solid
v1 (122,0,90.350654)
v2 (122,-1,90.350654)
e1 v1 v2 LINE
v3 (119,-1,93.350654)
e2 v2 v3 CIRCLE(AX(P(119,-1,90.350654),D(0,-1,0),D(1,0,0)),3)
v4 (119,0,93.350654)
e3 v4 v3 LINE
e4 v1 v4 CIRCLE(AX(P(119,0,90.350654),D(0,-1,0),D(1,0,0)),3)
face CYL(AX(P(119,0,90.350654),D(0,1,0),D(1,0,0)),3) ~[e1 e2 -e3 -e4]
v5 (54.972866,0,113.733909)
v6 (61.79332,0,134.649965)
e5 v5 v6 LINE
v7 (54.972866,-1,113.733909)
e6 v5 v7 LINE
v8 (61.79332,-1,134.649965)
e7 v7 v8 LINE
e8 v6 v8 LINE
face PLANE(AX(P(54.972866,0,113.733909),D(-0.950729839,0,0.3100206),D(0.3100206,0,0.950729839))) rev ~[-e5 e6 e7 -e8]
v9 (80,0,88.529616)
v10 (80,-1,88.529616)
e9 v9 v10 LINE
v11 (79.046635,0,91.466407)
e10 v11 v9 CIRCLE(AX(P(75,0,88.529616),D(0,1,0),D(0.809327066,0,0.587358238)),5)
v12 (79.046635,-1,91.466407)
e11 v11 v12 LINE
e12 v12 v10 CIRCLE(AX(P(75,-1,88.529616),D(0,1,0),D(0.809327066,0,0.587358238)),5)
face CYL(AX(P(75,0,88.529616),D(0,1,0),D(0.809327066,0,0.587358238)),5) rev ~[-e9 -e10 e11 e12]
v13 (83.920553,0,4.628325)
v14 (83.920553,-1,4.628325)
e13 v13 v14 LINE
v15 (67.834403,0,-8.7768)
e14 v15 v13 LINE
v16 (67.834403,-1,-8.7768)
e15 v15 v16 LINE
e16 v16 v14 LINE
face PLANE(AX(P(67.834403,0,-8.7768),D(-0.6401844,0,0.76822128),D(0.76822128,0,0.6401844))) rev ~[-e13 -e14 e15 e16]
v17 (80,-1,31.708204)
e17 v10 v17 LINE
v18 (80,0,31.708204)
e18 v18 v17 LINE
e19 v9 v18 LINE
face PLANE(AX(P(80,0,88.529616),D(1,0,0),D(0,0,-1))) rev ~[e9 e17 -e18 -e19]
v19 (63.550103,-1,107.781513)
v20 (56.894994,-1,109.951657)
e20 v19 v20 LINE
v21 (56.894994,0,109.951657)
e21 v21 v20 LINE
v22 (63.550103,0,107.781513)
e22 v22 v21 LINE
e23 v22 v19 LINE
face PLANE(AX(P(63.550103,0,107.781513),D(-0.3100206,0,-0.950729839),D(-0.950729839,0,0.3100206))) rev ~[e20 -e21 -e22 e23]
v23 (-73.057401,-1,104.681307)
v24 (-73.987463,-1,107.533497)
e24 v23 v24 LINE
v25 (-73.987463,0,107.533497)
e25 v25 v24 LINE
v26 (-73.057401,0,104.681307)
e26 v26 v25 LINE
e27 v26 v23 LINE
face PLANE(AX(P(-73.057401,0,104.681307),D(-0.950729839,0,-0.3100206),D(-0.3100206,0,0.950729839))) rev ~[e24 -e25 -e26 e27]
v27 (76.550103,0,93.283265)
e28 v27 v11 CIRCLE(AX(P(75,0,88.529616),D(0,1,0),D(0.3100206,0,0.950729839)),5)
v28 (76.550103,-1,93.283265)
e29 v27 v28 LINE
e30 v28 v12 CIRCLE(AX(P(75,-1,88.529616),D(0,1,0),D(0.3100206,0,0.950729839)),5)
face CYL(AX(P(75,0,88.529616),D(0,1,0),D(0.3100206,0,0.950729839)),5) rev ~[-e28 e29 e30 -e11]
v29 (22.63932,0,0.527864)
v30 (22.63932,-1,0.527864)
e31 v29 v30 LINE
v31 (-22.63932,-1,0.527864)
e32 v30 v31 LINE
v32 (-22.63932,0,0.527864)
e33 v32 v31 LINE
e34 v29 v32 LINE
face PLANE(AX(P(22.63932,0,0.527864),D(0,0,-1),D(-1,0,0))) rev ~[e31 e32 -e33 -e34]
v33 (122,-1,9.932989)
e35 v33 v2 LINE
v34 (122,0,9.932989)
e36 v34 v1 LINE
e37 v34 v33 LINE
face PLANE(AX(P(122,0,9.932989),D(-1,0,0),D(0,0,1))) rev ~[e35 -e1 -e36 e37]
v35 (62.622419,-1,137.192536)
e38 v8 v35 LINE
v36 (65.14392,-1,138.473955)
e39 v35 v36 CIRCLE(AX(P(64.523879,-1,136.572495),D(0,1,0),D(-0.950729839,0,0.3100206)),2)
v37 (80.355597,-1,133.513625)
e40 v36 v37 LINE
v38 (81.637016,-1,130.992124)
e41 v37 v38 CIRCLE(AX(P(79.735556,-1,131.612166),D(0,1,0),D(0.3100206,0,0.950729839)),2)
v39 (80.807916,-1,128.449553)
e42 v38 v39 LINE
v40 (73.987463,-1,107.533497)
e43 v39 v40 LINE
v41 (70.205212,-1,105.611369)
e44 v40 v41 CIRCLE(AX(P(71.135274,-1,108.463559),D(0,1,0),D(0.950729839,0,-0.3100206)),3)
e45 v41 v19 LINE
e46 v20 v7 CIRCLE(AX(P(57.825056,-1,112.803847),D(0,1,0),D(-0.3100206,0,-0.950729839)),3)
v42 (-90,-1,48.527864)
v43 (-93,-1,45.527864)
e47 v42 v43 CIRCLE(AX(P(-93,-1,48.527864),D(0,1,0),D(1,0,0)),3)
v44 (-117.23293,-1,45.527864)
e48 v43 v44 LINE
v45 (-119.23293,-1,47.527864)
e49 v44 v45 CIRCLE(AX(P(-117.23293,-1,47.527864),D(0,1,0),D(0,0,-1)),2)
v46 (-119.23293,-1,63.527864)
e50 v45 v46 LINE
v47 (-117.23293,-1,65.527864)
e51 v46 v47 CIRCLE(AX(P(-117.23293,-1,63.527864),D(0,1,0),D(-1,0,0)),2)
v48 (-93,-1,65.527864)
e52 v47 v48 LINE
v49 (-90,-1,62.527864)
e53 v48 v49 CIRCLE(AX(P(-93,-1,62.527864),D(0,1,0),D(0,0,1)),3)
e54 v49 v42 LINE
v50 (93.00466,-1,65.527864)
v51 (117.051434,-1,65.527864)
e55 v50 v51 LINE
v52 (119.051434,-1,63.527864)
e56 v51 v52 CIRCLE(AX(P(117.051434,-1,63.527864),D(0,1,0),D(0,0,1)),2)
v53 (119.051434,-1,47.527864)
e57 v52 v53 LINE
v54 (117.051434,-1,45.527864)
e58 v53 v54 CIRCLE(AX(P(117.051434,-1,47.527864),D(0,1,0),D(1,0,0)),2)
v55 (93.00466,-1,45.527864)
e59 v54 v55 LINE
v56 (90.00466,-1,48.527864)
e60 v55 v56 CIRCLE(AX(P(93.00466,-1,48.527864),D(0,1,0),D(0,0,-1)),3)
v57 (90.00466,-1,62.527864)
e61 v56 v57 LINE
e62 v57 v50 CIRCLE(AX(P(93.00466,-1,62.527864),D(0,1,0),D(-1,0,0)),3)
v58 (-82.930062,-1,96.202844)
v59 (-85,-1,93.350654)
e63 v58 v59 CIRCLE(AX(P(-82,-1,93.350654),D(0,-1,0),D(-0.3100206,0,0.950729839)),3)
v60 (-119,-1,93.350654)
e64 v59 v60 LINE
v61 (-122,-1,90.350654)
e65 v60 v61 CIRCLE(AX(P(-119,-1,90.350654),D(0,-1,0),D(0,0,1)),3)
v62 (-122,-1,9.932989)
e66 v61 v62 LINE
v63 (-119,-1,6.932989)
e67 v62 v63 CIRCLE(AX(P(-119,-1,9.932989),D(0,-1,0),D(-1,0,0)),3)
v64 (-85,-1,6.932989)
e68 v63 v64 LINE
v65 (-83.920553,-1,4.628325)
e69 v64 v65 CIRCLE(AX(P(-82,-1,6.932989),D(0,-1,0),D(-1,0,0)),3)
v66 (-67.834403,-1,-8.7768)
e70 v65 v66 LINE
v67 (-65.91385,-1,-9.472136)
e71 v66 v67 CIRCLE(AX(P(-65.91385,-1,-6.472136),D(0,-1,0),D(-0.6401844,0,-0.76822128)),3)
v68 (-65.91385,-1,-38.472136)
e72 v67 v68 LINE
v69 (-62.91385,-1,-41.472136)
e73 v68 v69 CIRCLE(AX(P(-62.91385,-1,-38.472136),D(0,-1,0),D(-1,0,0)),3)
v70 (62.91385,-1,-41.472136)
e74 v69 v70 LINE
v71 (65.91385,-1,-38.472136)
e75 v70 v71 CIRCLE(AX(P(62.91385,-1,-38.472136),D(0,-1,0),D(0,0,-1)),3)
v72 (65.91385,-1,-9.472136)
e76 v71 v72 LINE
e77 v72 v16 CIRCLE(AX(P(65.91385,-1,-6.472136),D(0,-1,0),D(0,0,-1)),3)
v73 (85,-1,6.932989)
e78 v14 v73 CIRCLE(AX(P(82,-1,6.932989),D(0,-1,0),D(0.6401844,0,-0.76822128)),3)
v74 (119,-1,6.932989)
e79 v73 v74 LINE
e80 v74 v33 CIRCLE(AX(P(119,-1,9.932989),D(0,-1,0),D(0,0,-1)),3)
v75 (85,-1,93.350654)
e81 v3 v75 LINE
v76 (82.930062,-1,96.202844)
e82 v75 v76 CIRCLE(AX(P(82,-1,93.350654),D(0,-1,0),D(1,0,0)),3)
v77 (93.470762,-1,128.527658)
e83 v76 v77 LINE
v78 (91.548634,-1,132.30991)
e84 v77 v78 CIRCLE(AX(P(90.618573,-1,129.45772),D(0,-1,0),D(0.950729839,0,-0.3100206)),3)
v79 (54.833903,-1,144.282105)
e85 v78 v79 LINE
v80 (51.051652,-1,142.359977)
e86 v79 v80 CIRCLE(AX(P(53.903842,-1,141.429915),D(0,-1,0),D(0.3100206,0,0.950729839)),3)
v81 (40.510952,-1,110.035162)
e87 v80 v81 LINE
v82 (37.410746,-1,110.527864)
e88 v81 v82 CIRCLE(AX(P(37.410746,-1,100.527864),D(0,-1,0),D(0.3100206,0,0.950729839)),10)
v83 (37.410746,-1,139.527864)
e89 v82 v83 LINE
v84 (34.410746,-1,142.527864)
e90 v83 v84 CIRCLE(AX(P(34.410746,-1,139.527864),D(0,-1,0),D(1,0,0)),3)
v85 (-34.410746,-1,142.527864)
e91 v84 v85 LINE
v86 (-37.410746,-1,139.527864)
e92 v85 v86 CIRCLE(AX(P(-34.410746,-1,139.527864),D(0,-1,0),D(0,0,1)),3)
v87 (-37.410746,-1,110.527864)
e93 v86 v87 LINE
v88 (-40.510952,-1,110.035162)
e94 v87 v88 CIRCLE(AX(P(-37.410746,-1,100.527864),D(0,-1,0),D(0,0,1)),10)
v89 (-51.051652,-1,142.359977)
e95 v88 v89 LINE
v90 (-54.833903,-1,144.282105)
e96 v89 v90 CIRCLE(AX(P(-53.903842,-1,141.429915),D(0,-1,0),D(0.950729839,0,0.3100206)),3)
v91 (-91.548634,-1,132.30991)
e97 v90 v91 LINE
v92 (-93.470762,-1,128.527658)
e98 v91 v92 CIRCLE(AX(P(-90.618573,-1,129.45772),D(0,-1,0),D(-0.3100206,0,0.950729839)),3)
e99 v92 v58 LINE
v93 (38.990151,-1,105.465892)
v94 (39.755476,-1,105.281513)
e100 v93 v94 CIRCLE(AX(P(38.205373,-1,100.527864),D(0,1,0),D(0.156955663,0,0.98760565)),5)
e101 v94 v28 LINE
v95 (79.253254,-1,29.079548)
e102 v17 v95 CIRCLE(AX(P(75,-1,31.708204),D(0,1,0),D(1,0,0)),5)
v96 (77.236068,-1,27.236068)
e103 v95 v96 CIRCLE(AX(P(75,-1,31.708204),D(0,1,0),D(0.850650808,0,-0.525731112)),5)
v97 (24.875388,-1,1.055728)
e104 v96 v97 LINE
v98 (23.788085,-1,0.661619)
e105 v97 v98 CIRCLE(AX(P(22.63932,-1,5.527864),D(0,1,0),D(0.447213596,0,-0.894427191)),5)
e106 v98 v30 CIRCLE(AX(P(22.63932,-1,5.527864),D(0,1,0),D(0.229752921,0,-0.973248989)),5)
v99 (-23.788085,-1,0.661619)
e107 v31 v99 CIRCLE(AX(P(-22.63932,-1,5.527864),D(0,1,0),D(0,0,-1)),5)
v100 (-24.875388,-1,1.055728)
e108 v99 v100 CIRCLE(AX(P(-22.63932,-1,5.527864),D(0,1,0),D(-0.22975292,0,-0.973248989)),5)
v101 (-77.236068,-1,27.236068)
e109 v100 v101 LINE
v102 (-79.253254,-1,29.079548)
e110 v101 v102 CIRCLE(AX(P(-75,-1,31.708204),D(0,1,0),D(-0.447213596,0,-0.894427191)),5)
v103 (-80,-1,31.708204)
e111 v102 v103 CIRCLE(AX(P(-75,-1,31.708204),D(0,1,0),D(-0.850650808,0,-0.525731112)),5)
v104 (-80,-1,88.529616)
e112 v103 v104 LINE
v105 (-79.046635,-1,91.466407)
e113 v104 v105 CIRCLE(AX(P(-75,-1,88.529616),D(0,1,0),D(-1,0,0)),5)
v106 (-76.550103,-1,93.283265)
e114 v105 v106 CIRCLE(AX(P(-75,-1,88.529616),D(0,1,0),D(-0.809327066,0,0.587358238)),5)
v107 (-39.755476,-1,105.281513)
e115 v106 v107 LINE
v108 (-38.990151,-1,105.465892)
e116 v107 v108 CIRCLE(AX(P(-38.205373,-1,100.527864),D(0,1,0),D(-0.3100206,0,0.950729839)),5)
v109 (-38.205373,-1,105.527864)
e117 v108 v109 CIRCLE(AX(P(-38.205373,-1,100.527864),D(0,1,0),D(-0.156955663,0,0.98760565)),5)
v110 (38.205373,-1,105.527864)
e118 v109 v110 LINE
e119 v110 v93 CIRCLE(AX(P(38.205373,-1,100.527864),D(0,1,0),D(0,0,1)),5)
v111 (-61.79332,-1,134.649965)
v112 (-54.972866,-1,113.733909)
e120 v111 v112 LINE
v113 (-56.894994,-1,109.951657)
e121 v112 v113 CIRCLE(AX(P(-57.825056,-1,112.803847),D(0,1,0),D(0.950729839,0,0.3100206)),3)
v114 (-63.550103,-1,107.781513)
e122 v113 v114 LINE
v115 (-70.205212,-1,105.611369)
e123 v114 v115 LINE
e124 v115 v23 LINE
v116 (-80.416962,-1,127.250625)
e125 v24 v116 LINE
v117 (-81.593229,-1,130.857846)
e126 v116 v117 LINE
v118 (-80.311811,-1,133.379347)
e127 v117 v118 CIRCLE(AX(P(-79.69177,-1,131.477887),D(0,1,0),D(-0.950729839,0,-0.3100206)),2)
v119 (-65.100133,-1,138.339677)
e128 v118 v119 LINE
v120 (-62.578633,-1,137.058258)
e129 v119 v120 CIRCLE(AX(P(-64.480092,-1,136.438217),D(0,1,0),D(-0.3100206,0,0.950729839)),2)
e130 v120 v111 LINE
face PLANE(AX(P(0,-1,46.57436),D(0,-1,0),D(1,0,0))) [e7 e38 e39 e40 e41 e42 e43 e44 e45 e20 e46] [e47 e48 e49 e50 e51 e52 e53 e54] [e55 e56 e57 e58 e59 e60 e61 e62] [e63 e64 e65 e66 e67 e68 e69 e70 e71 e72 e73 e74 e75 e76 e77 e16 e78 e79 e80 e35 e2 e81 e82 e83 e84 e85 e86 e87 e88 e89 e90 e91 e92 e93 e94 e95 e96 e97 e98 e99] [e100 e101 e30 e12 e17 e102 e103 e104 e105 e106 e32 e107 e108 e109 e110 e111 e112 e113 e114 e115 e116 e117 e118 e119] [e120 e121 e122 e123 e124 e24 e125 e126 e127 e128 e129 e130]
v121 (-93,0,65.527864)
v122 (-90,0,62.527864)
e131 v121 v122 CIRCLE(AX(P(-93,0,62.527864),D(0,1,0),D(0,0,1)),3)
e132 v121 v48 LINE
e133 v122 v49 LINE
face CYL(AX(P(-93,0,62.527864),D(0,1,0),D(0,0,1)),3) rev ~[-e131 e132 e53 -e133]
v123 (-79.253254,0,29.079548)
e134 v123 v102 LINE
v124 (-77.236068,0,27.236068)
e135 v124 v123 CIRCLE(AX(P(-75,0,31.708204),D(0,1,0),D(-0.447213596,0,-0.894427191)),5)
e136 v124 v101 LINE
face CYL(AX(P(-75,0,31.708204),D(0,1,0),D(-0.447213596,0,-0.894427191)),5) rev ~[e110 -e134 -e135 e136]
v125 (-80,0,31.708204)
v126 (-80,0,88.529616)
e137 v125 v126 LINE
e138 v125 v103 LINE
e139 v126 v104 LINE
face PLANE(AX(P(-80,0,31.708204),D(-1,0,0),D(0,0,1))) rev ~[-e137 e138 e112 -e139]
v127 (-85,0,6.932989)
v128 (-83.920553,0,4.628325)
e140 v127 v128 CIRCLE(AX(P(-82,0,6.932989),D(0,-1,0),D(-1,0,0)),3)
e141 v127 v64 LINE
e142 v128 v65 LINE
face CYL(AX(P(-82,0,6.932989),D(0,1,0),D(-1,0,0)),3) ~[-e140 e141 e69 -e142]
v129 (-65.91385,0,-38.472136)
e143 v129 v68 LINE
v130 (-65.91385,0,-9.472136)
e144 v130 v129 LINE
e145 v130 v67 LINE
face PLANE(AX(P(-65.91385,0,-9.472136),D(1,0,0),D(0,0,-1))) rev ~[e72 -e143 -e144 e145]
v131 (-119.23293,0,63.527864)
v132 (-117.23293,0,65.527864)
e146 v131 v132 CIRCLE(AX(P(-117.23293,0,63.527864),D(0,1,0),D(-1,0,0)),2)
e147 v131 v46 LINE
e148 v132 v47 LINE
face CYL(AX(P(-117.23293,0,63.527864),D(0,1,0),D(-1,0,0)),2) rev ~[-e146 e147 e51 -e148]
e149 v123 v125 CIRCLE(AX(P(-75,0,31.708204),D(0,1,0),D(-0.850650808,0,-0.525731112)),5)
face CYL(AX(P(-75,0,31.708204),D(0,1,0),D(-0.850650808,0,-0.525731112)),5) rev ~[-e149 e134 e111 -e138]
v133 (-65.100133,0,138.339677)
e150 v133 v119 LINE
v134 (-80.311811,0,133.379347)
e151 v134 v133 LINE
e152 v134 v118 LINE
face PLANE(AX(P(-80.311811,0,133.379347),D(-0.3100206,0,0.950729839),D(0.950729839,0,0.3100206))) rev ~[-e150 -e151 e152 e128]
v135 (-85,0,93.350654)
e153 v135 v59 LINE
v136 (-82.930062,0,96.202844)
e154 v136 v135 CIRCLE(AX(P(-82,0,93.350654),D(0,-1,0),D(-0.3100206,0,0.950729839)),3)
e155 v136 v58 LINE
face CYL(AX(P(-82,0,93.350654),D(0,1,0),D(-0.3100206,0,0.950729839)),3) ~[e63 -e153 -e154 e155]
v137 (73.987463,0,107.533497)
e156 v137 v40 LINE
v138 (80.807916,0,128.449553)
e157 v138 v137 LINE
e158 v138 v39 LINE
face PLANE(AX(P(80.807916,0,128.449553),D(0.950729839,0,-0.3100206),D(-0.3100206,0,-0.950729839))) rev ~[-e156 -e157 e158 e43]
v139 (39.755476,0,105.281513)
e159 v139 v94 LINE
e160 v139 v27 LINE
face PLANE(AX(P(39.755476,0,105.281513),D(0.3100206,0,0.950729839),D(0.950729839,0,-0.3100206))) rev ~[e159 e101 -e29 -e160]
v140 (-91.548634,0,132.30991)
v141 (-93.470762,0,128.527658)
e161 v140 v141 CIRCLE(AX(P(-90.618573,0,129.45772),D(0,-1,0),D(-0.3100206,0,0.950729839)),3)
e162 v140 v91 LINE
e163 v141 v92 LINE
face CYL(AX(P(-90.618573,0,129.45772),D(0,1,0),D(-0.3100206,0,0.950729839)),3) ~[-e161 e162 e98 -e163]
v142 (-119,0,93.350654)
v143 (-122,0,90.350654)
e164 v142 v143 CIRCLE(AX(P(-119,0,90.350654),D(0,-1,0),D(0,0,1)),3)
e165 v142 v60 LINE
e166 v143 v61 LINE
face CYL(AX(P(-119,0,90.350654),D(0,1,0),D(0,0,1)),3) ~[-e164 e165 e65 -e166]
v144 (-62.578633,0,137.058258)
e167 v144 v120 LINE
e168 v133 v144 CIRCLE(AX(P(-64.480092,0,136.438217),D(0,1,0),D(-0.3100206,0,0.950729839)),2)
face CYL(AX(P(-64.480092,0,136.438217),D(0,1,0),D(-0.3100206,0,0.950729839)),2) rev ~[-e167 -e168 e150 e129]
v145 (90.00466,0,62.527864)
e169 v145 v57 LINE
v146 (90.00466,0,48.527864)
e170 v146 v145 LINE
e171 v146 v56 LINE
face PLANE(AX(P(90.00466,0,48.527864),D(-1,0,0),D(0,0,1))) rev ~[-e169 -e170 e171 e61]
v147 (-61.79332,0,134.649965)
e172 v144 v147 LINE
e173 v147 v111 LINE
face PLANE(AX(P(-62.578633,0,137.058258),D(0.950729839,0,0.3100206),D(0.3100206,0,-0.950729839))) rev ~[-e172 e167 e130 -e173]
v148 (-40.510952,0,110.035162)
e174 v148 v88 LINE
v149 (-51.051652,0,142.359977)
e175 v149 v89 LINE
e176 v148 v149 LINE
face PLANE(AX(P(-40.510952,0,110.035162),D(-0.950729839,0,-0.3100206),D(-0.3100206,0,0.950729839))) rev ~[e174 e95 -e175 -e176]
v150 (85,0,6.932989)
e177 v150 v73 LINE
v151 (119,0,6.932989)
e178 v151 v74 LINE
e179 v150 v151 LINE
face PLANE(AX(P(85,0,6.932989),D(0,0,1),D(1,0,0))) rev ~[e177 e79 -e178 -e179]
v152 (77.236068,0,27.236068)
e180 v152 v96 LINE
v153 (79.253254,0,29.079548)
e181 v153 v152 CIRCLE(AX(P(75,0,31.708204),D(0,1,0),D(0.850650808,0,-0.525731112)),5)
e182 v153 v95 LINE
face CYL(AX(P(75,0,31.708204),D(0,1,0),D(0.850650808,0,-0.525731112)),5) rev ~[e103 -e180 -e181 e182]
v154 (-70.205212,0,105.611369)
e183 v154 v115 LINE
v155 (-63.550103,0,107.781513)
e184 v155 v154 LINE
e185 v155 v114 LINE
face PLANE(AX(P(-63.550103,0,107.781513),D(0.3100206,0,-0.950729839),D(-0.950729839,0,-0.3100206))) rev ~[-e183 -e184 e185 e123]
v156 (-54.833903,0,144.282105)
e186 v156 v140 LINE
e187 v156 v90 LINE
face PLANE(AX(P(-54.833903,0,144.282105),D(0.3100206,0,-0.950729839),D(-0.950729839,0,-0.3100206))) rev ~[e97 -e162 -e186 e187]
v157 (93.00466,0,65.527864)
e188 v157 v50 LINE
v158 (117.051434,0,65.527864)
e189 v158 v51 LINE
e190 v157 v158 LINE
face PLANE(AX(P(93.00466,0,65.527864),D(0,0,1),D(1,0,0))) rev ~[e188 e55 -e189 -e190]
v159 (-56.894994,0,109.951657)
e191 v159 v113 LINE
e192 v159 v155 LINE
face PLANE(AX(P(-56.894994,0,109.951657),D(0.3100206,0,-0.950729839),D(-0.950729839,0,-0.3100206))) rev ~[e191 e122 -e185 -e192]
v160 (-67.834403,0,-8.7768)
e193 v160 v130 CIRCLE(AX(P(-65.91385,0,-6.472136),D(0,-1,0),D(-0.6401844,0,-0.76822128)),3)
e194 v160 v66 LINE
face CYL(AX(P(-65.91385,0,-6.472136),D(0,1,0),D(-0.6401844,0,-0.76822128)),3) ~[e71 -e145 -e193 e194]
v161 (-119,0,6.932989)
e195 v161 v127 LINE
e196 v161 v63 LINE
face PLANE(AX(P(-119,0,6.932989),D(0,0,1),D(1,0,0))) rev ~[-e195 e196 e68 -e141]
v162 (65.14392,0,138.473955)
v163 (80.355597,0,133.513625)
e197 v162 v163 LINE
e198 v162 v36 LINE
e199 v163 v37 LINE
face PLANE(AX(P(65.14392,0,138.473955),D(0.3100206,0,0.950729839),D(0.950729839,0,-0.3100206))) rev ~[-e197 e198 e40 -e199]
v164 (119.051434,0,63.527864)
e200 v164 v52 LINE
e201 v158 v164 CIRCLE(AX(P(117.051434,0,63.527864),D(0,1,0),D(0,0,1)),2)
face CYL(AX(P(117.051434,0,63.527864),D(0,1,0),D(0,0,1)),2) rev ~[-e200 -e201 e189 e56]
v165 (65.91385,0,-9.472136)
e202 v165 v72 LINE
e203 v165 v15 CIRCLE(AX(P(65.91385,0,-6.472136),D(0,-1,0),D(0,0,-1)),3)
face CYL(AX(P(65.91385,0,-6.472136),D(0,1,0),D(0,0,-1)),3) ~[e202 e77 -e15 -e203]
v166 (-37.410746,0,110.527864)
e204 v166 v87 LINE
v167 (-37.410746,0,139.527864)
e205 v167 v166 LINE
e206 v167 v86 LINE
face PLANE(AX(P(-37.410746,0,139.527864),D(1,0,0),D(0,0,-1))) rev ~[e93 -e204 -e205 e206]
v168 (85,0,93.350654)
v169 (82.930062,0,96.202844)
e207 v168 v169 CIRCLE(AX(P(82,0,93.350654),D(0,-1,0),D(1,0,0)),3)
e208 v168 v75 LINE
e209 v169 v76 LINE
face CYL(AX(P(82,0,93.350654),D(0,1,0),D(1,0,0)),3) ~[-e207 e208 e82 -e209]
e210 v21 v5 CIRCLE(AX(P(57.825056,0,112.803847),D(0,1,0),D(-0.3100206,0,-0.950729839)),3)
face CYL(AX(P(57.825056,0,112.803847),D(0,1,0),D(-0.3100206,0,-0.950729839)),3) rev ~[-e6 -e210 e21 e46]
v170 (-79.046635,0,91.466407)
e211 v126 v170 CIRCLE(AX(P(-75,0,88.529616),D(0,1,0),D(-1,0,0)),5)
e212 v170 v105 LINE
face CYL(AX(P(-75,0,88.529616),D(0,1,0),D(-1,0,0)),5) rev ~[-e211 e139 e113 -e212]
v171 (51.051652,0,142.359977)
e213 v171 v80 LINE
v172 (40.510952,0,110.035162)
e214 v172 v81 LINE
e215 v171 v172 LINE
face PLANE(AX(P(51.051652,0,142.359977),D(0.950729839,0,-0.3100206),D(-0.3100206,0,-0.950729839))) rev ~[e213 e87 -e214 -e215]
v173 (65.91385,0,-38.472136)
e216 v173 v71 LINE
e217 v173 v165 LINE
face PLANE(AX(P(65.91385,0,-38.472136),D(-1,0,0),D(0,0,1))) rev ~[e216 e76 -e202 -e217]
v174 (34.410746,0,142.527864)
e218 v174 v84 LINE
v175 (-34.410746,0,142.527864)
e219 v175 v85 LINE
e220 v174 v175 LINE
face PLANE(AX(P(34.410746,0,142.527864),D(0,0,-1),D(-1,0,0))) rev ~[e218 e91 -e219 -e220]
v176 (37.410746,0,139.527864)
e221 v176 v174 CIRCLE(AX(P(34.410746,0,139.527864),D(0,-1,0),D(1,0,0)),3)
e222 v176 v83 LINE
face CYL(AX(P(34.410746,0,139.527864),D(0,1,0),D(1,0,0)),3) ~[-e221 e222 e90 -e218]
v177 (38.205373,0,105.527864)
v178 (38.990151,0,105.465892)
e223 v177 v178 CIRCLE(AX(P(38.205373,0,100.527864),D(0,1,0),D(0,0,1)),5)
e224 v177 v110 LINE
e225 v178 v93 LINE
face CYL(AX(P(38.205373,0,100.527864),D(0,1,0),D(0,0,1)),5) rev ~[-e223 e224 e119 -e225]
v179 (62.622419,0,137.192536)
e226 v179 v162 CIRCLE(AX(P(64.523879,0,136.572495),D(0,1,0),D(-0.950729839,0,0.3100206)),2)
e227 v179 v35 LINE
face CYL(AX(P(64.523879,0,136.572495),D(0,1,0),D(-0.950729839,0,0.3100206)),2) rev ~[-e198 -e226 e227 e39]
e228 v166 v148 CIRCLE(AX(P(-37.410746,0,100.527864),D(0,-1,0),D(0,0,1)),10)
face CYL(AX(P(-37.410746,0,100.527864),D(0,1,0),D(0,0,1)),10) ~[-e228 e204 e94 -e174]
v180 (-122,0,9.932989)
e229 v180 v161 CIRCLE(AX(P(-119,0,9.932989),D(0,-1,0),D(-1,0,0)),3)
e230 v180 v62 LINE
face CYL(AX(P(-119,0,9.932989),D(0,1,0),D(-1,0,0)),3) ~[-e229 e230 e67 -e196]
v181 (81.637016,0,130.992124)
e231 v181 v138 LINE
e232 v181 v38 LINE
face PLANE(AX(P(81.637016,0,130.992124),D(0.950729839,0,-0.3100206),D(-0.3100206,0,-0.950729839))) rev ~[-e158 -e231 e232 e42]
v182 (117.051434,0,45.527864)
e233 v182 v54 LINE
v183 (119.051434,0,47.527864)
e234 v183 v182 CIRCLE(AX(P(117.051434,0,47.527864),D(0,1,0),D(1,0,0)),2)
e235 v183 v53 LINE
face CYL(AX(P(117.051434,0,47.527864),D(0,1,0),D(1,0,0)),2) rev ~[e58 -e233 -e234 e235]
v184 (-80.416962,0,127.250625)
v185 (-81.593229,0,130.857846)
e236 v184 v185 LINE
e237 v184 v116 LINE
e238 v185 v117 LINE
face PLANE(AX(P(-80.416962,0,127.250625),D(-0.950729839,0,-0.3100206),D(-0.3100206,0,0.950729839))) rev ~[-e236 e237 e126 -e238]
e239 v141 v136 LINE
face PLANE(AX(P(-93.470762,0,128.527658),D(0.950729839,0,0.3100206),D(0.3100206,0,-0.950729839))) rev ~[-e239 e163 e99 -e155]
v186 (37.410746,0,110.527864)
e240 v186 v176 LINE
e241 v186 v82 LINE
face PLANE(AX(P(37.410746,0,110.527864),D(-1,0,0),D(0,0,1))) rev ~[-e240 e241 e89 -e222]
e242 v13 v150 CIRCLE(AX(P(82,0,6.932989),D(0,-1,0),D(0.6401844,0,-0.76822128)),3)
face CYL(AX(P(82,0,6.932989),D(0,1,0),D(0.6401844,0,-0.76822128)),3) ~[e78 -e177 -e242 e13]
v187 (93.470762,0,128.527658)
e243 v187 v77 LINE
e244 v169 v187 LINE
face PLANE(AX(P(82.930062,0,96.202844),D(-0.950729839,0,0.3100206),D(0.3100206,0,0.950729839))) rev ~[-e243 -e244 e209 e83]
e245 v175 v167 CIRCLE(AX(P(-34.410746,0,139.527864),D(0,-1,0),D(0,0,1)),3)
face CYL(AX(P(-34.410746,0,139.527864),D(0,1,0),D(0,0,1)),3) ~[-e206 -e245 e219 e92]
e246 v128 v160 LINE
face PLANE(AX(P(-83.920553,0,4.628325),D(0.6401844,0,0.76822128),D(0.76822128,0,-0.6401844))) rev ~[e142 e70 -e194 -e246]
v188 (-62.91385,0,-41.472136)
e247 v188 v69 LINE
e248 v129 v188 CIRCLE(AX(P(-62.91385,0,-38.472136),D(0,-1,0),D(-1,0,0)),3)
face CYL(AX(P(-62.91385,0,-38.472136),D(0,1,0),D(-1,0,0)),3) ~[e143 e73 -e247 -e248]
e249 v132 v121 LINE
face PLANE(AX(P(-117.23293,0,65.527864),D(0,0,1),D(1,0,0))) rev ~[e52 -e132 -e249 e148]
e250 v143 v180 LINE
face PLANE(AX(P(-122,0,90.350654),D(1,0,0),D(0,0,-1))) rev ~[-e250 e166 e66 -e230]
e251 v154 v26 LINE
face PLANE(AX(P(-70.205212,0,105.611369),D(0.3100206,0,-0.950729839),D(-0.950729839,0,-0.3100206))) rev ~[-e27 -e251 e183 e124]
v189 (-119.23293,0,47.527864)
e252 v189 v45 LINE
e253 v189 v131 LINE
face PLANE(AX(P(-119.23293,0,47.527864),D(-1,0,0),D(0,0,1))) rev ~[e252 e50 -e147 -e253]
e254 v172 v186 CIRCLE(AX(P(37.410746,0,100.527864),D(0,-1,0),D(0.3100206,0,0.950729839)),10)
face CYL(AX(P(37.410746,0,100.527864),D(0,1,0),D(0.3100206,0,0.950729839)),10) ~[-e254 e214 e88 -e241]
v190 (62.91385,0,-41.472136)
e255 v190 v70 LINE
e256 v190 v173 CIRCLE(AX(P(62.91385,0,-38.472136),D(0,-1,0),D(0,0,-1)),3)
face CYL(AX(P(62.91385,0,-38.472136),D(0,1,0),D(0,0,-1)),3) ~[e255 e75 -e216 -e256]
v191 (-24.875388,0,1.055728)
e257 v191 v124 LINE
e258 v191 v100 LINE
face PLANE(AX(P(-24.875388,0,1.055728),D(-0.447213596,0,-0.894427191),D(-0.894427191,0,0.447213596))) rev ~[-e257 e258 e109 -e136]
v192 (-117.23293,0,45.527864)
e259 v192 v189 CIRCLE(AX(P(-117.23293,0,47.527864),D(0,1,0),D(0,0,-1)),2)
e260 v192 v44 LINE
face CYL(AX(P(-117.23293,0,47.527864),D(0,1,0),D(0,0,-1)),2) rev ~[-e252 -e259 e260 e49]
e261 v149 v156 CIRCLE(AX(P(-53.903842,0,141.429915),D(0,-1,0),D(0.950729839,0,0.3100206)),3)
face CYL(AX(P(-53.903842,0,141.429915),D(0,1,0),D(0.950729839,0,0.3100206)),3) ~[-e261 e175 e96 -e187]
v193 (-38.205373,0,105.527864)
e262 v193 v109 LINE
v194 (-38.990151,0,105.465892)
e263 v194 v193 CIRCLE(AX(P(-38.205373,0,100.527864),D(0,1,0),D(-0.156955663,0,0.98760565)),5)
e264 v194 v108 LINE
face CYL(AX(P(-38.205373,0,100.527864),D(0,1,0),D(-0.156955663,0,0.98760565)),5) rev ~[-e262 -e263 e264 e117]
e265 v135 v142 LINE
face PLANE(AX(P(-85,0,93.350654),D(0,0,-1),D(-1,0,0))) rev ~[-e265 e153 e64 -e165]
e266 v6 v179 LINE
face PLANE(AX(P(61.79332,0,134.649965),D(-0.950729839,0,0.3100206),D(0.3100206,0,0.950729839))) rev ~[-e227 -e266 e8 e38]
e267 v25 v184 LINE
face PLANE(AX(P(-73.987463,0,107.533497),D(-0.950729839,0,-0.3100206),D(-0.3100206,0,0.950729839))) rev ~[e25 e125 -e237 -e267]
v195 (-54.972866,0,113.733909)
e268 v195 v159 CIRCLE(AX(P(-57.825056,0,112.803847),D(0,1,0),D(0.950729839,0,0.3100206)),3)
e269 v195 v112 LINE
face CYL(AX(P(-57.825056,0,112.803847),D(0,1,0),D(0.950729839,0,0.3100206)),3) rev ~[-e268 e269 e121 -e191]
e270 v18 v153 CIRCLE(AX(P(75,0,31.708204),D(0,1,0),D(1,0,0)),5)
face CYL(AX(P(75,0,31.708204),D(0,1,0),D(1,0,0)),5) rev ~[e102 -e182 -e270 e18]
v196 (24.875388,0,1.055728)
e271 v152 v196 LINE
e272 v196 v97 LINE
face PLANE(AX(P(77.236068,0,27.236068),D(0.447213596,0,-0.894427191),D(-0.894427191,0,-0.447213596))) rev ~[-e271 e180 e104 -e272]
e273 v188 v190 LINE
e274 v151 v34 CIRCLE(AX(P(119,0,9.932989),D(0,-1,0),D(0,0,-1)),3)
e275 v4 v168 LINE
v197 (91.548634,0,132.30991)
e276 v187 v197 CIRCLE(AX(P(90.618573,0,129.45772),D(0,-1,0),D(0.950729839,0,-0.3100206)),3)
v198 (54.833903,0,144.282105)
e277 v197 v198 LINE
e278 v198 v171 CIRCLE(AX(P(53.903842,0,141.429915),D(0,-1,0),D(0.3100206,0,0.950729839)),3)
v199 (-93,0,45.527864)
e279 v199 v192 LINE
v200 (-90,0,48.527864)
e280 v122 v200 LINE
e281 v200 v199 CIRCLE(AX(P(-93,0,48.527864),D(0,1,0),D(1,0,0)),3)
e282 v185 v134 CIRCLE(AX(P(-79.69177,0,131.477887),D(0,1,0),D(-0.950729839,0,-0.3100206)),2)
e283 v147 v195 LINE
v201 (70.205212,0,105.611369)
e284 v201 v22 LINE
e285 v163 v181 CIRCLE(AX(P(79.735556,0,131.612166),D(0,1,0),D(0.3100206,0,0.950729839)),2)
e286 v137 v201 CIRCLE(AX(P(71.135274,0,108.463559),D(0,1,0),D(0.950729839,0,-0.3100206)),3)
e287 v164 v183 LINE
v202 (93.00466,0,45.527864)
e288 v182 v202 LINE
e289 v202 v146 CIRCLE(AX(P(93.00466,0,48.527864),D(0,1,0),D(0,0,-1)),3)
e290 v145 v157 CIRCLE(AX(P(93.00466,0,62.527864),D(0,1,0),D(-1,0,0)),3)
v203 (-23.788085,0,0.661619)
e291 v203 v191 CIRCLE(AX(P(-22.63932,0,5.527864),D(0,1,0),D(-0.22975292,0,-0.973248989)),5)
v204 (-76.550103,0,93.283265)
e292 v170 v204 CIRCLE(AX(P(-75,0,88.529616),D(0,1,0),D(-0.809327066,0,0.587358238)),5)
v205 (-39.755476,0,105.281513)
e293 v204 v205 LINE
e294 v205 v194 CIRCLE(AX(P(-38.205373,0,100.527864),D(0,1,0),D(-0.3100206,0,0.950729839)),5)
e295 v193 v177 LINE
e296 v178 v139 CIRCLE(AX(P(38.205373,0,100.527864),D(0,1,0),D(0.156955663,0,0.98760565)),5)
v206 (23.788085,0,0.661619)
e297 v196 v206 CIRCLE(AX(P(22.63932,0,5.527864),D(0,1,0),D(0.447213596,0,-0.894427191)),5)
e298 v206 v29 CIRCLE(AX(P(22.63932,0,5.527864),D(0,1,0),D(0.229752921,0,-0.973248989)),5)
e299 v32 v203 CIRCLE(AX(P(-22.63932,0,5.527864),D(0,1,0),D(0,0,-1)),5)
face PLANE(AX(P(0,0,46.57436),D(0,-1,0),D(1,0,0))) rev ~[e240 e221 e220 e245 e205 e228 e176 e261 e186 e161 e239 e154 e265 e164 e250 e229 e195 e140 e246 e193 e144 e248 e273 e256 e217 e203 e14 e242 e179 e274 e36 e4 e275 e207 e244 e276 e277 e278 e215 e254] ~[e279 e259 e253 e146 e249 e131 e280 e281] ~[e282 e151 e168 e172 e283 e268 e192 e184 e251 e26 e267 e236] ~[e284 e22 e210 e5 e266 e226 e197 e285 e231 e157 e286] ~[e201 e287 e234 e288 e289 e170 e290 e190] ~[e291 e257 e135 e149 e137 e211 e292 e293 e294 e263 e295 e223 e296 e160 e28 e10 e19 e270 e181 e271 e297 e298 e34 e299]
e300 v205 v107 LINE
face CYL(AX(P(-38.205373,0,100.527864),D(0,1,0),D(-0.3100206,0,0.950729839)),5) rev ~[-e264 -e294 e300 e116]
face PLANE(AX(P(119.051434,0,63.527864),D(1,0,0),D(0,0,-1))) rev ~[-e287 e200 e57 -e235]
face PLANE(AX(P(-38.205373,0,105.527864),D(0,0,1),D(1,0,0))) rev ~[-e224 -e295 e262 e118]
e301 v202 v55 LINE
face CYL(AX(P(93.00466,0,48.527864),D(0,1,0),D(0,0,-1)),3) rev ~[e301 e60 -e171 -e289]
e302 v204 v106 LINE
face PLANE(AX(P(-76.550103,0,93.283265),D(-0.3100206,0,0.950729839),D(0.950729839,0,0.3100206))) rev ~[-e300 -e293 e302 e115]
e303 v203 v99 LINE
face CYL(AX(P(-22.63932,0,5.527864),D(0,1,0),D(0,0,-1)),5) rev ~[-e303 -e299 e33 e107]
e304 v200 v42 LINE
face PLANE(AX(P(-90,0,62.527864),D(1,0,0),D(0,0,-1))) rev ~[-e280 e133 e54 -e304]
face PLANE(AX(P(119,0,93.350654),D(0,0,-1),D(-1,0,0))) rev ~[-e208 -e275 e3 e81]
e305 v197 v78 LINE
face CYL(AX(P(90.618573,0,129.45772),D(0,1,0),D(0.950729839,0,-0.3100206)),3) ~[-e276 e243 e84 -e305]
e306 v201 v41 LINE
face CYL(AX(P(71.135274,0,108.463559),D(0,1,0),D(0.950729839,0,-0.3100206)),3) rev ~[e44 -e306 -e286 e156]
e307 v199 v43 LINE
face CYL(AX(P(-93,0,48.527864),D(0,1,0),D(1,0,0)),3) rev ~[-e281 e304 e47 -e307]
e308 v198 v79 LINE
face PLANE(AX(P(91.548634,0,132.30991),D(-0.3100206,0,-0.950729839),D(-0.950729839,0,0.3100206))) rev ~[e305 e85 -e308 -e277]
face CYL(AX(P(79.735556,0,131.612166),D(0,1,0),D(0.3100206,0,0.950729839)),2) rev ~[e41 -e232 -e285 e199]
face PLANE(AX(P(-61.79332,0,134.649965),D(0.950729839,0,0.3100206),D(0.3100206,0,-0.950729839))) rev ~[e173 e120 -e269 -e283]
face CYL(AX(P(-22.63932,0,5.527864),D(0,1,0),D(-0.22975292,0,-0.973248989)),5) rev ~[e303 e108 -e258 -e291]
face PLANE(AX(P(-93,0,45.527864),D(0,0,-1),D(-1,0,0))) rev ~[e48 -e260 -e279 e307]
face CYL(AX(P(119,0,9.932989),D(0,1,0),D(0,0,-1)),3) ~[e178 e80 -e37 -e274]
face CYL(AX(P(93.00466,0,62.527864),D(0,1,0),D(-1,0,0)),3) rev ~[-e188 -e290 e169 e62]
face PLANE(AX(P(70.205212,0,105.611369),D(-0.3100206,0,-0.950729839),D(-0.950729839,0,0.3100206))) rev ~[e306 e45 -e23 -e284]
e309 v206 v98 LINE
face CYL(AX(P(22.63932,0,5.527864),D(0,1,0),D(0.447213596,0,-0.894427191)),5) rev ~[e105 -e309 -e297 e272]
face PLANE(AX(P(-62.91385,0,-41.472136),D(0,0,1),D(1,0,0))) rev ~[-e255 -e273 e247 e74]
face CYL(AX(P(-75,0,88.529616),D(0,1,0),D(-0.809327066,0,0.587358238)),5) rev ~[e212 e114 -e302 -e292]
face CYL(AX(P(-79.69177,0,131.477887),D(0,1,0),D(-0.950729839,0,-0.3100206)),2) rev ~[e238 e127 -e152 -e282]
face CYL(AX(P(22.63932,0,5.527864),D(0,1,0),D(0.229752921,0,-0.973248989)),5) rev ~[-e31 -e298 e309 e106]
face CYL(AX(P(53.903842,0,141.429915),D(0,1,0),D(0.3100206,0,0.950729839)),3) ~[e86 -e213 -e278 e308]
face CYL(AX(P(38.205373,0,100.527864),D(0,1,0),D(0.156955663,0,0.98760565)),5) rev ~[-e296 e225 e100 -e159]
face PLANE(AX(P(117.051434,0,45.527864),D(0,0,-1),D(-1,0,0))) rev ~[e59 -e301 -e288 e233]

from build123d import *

# Parameters (mm, degrees)
F1_DEPTH = 1


# Not quite as in the source:
# - a feature names something its author has since deleted; it is built from what else it names


with BuildPart() as f1:
    # F0 (on Front) → F1 (new body)
    with BuildSketch(Plane.XZ):
        with BuildLine():
            ThreePointArc((83.920553199, 4.6283250442), (84.7167682637, 5.6605226942), (85, 6.932988883))
            Line((85, 6.932988883), (85, 25.527864045))
            Line((85, 25.527864045), (85, 45.527864045))
            Line((85, 45.527864045), (85, 55.527864045))
            Line((85, 55.527864045), (85, 65.527864045))
            Line((85, 65.527864045), (85, 90.527864045))
            Line((85, 90.527864045), (85, 93.3506543745))
            ThreePointArc((85, 93.3506543745), (84.4279811983, 95.1127290894), (82.9300617995, 96.202843893))
            Line((82.9300617995, 96.202843893), (71.5072983948, 99.9276580467))
            Line((71.5072983948, 99.9276580467), (62, 103.027864045))
            Line((62, 103.027864045), (52.4927016052, 106.1280700433))
            Line((52.4927016052, 106.1280700433), (40.5109515892, 110.0351624398))
            ThreePointArc((40.5109515892, 110.0351624398), (38.9803022245, 110.4039205441), (37.4107455909, 110.527864045))
            Line((37.4107455909, 110.527864045), (37.4107455909, 139.527864045))
            ThreePointArc((37.4107455909, 139.527864045), (36.5320659345, 141.6491843886), (34.4107455909, 142.527864045))
            Line((34.4107455909, 142.527864045), (0, 142.527864045))
            Line((0, 142.527864045), (-34.4107455909, 142.527864045))
            ThreePointArc((-34.4107455909, 142.527864045), (-36.5320659345, 141.6491843886), (-37.4107455909, 139.527864045))
            Line((-37.4107455909, 139.527864045), (-37.4107455909, 110.527864045))
            ThreePointArc((-37.4107455909, 110.527864045), (-38.9803022245, 110.4039205441), (-40.5109515892, 110.0351624398))
            Line((-40.5109515892, 110.0351624398), (-52.4927016052, 106.1280700433))
            Line((-52.4927016052, 106.1280700433), (-62, 103.027864045))
            Line((-62, 103.027864045), (-71.5072983948, 99.9276580467))
            Line((-71.5072983948, 99.9276580467), (-82.9300617995, 96.202843893))
            ThreePointArc((-82.9300617995, 96.202843893), (-84.4279811983, 95.1127290894), (-85, 93.3506543745))
            Line((-85, 93.3506543745), (-85, 90.527864045))
            Line((-85, 90.527864045), (-85, 65.527864045))
            Line((-85, 65.527864045), (-85, 45.527864045))
            Line((-85, 45.527864045), (-85, 25.527864045))
            Line((-85, 25.527864045), (-85, 6.932988883))
            ThreePointArc((-85, 6.932988883), (-84.7167682637, 5.6605226942), (-83.920553199, 4.6283250442))
            Line((-83.920553199, 4.6283250442), (-67.8344033934, -8.7767997938))
            ThreePointArc((-67.8344033934, -8.7767997938), (-66.9351259857, -9.292950688), (-65.9138501945, -9.472135955))
            Line((-65.9138501945, -9.472135955), (-65.9138501945, -38.472135955))
            ThreePointArc((-65.9138501945, -38.472135955), (-65.035170538, -40.5934562986), (-62.9138501945, -41.472135955))
            Line((-62.9138501945, -41.472135955), (0, -41.472135955))
            Line((0, -41.472135955), (62.9138501945, -41.472135955))
            ThreePointArc((62.9138501945, -41.472135955), (65.035170538, -40.5934562986), (65.9138501945, -38.472135955))
            Line((65.9138501945, -38.472135955), (65.9138501945, -9.472135955))
            ThreePointArc((65.9138501945, -9.472135955), (66.9351259857, -9.292950688), (67.8344033934, -8.7767997938))
            Line((67.8344033934, -8.7767997938), (83.920553199, 4.6283250442))
        make_face()
        with BuildLine():
            ThreePointArc((38.9901511122, 105.4658922946), (39.3764477711, 105.3887881754), (39.7554757946, 105.2815132424))
            Line((39.7554757946, 105.2815132424), (76.5501029992, 93.2832652409))
            ThreePointArc((76.5501029992, 93.2832652409), (77.9421273317, 92.5723733654), (79.0466353305, 91.466407235))
            ThreePointArc((79.0466353305, 91.466407235), (79.7556900999, 90.0734462394), (80, 88.5296160435))
            Line((80, 88.5296160435), (80, 31.7082039325))
            ThreePointArc((80, 31.7082039325), (79.8096917889, 30.3418712879), (79.2532540418, 29.0795483719))
            ThreePointArc((79.2532540418, 29.0795483719), (78.3730446274, 28.0173273508), (77.2360679775, 27.2360679775))
            Line((77.2360679775, 27.2360679775), (24.8753882025, 1.05572809))
            ThreePointArc((24.8753882025, 1.05572809), (24.3431697998, 0.8271304186), (23.7880848277, 0.6616190977))
            ThreePointArc((23.7880848277, 0.6616190977), (23.2175828225, 0.5614153774), (22.639320225, 0.527864045))
            Line((22.639320225, 0.527864045), (0, 0.527864045))
            Line((0, 0.527864045), (-22.639320225, 0.527864045))
            ThreePointArc((-22.639320225, 0.527864045), (-23.2175828225, 0.5614153774), (-23.7880848277, 0.6616190977))
            ThreePointArc((-23.7880848277, 0.6616190977), (-24.3431697998, 0.8271304186), (-24.8753882025, 1.05572809))
            Line((-24.8753882025, 1.05572809), (-77.2360679775, 27.2360679775))
            ThreePointArc((-77.2360679775, 27.2360679775), (-78.3730446274, 28.0173273508), (-79.2532540418, 29.0795483719))
            ThreePointArc((-79.2532540418, 29.0795483719), (-79.8096917889, 30.3418712879), (-80, 31.7082039325))
            Line((-80, 31.7082039325), (-80, 88.5296160435))
            ThreePointArc((-80, 88.5296160435), (-79.7556900999, 90.0734462394), (-79.0466353305, 91.466407235))
            ThreePointArc((-79.0466353305, 91.466407235), (-77.9421273317, 92.5723733654), (-76.5501029992, 93.2832652409))
            Line((-76.5501029992, 93.2832652409), (-39.7554757946, 105.2815132424))
            ThreePointArc((-39.7554757946, 105.2815132424), (-39.3764477711, 105.3887881754), (-38.9901511122, 105.4658922946))
            ThreePointArc((-38.9901511122, 105.4658922946), (-38.5989834865, 105.5123470296), (-38.2053727955, 105.527864045))
            Line((-38.2053727955, 105.527864045), (0, 105.527864045))
            Line((0, 105.527864045), (38.2053727955, 105.527864045))
            ThreePointArc((38.2053727955, 105.527864045), (38.5989834865, 105.5123470296), (38.9901511122, 105.4658922946))
        make_face(mode=Mode.SUBTRACT)
        with BuildLine():
            Line((71.5072983948, 99.9276580467), (82.9300617995, 96.202843893))
            Line((82.9300617995, 96.202843893), (93.4707621937, 128.5276584354))
            ThreePointArc((93.4707621937, 128.5276584354), (93.2930282304, 130.8168697792), (91.5486344748, 132.3099097533))
            Line((91.5486344748, 132.3099097533), (54.8339033014, 144.2821047011))
            ThreePointArc((54.8339033014, 144.2821047011), (52.5446919576, 144.1043707378), (51.0516519835, 142.3599769822))
            Line((51.0516519835, 142.3599769822), (40.5109515892, 110.0351624398))
            Line((40.5109515892, 110.0351624398), (52.4927016052, 106.1280700433))
            Line((52.4927016052, 106.1280700433), (62, 103.027864045))
            Line((62, 103.027864045), (71.5072983948, 99.9276580467))
        make_face()
        with BuildLine():
            Line((70.2052118755, 105.6113690436), (63.5501029992, 107.7815132424))
            Line((63.5501029992, 107.7815132424), (56.8949941228, 109.9516574412))
            ThreePointArc((56.8949941228, 109.9516574412), (55.1506003672, 111.4446974153), (54.9728664038, 113.7339087592))
            Line((54.9728664038, 113.7339087592), (61.7933196001, 134.6499652278))
            Line((61.7933196001, 134.6499652278), (62.6224189104, 137.192536446))
            ThreePointArc((62.6224189104, 137.192536446), (63.6177788931, 138.3554656164), (65.143919789, 138.4739549253))
            Line((65.143919789, 138.4739549253), (80.3555972207, 133.513625328))
            ThreePointArc((80.3555972207, 133.513625328), (81.5185263911, 132.5182653453), (81.6370157, 130.9921244494))
            Line((81.6370157, 130.9921244494), (80.8079163897, 128.4495532311))
            Line((80.8079163897, 128.4495532311), (73.9874631935, 107.5334967625))
            ThreePointArc((73.9874631935, 107.5334967625), (72.4944232194, 105.789103007), (70.2052118755, 105.6113690436))
        make_face(mode=Mode.SUBTRACT)
        with BuildLine():
            Line((85, 25.527864045), (85, 6.932988883))
            Line((85, 6.932988883), (114, 6.932988883))
            Line((114, 6.932988883), (117, 6.932988883))
            Line((117, 6.932988883), (119, 6.932988883))
            ThreePointArc((119, 6.932988883), (121.1213203436, 7.8116685394), (122, 9.932988883))
            Line((122, 9.932988883), (122, 90.3506543745))
            ThreePointArc((122, 90.3506543745), (121.1213203436, 92.4719747181), (119, 93.3506543745))
            Line((119, 93.3506543745), (117, 93.3506543745))
            Line((117, 93.3506543745), (114, 93.3506543745))
            Line((114, 93.3506543745), (85, 93.3506543745))
            Line((85, 93.3506543745), (85, 90.527864045))
            Line((85, 90.527864045), (85, 65.527864045))
            Line((85, 65.527864045), (85, 55.527864045))
            Line((85, 55.527864045), (85, 45.527864045))
            Line((85, 45.527864045), (85, 25.527864045))
        make_face()
        with BuildLine():
            Line((90.0046601892, 48.527864045), (90.0046601892, 55.527864045))
            Line((90.0046601892, 55.527864045), (90.0046601892, 62.527864045))
            ThreePointArc((90.0046601892, 62.527864045), (90.8833398456, 64.6491843886), (93.0046601892, 65.527864045))
            Line((93.0046601892, 65.527864045), (117.0514340997, 65.527864045))
            ThreePointArc((117.0514340997, 65.527864045), (118.465647662, 64.9420776074), (119.0514340997, 63.527864045))
            Line((119.0514340997, 63.527864045), (119.0514340997, 55.527864045))
            Line((119.0514340997, 55.527864045), (119.0514340997, 47.527864045))
            ThreePointArc((119.0514340997, 47.527864045), (118.465647662, 46.1136504826), (117.0514340997, 45.527864045))
            Line((117.0514340997, 45.527864045), (93.0046601892, 45.527864045))
            ThreePointArc((93.0046601892, 45.527864045), (90.8833398456, 46.4065437014), (90.0046601892, 48.527864045))
        make_face(mode=Mode.SUBTRACT)
        with BuildLine():
            Line((-114, 6.932988883), (-85, 6.932988883))
            Line((-85, 6.932988883), (-85, 25.527864045))
            Line((-85, 25.527864045), (-85, 45.527864045))
            Line((-85, 45.527864045), (-85, 65.527864045))
            Line((-85, 65.527864045), (-85, 90.527864045))
            Line((-85, 90.527864045), (-85, 93.3506543745))
            Line((-85, 93.3506543745), (-114, 93.3506543745))
            Line((-114, 93.3506543745), (-117, 93.3506543745))
            Line((-117, 93.3506543745), (-119, 93.3506543745))
            ThreePointArc((-119, 93.3506543745), (-121.1213203436, 92.4719747181), (-122, 90.3506543745))
            Line((-122, 90.3506543745), (-122, 9.932988883))
            ThreePointArc((-122, 9.932988883), (-121.1213203436, 7.8116685394), (-119, 6.932988883))
            Line((-119, 6.932988883), (-117, 6.932988883))
            Line((-117, 6.932988883), (-114, 6.932988883))
        make_face()
        with BuildLine():
            Line((-90, 55.527864045), (-90, 48.527864045))
            ThreePointArc((-90, 48.527864045), (-90.8786796564, 46.4065437014), (-93, 45.527864045))
            Line((-93, 45.527864045), (-108.2668378949, 45.527864045))
            Line((-108.2668378949, 45.527864045), (-115, 45.527864045))
            Line((-115, 45.527864045), (-116, 45.527864045))
            Line((-116, 45.527864045), (-117.232930243, 45.527864045))
            ThreePointArc((-117.232930243, 45.527864045), (-118.6471438054, 46.1136504826), (-119.232930243, 47.527864045))
            Line((-119.232930243, 47.527864045), (-119.232930243, 55.527864045))
            Line((-119.232930243, 55.527864045), (-119.232930243, 63.527864045))
            ThreePointArc((-119.232930243, 63.527864045), (-118.6471438054, 64.9420776074), (-117.232930243, 65.527864045))
            Line((-117.232930243, 65.527864045), (-116, 65.527864045))
            Line((-116, 65.527864045), (-115, 65.527864045))
            Line((-115, 65.527864045), (-113.2454946637, 65.527864045))
            Line((-113.2454946637, 65.527864045), (-93, 65.527864045))
            ThreePointArc((-93, 65.527864045), (-90.8786796564, 64.6491843886), (-90, 62.527864045))
            Line((-90, 62.527864045), (-90, 55.527864045))
        make_face(mode=Mode.SUBTRACT)
        with BuildLine():
            Line((-93.4707621937, 128.5276584354), (-82.9300617995, 96.202843893))
            Line((-82.9300617995, 96.202843893), (-71.5072983948, 99.9276580467))
            Line((-71.5072983948, 99.9276580467), (-62, 103.027864045))
            Line((-62, 103.027864045), (-52.4927016052, 106.1280700433))
            Line((-52.4927016052, 106.1280700433), (-40.5109515892, 110.0351624398))
            Line((-40.5109515892, 110.0351624398), (-51.0516519835, 142.3599769822))
            ThreePointArc((-51.0516519835, 142.3599769822), (-52.5446919576, 144.1043707378), (-54.8339033014, 144.2821047011))
            Line((-54.8339033014, 144.2821047011), (-91.5486344748, 132.3099097533))
            ThreePointArc((-91.5486344748, 132.3099097533), (-93.2930282304, 130.8168697792), (-93.4707621937, 128.5276584354))
        make_face()
        with BuildLine():
            Line((-56.8949941228, 109.9516574412), (-63.5501029992, 107.7815132424))
            Line((-63.5501029992, 107.7815132424), (-70.2052118755, 105.6113690436))
            Line((-70.2052118755, 105.6113690436), (-73.057401394, 104.6813072441))
            Line((-73.057401394, 104.6813072441), (-73.9874631935, 107.5334967625))
            Line((-73.9874631935, 107.5334967625), (-80.4169615485, 127.2506250513))
            Line((-80.4169615485, 127.2506250513), (-81.5932293444, 130.8578462922))
            ThreePointArc((-81.5932293444, 130.8578462922), (-81.4747400355, 132.3839871881), (-80.3118108651, 133.3793471708))
            Line((-80.3118108651, 133.3793471708), (-65.1001334334, 138.3396767681))
            ThreePointArc((-65.1001334334, 138.3396767681), (-63.5739925375, 138.2211874592), (-62.5786325548, 137.0582582888))
            Line((-62.5786325548, 137.0582582888), (-61.7933196001, 134.6499652278))
            Line((-61.7933196001, 134.6499652278), (-54.9728664038, 113.7339087592))
            ThreePointArc((-54.9728664038, 113.7339087592), (-55.1506003672, 111.4446974153), (-56.8949941228, 109.9516574412))
        make_face(mode=Mode.SUBTRACT)
    extrude(amount=F1_DEPTH)


solid = f1.part
